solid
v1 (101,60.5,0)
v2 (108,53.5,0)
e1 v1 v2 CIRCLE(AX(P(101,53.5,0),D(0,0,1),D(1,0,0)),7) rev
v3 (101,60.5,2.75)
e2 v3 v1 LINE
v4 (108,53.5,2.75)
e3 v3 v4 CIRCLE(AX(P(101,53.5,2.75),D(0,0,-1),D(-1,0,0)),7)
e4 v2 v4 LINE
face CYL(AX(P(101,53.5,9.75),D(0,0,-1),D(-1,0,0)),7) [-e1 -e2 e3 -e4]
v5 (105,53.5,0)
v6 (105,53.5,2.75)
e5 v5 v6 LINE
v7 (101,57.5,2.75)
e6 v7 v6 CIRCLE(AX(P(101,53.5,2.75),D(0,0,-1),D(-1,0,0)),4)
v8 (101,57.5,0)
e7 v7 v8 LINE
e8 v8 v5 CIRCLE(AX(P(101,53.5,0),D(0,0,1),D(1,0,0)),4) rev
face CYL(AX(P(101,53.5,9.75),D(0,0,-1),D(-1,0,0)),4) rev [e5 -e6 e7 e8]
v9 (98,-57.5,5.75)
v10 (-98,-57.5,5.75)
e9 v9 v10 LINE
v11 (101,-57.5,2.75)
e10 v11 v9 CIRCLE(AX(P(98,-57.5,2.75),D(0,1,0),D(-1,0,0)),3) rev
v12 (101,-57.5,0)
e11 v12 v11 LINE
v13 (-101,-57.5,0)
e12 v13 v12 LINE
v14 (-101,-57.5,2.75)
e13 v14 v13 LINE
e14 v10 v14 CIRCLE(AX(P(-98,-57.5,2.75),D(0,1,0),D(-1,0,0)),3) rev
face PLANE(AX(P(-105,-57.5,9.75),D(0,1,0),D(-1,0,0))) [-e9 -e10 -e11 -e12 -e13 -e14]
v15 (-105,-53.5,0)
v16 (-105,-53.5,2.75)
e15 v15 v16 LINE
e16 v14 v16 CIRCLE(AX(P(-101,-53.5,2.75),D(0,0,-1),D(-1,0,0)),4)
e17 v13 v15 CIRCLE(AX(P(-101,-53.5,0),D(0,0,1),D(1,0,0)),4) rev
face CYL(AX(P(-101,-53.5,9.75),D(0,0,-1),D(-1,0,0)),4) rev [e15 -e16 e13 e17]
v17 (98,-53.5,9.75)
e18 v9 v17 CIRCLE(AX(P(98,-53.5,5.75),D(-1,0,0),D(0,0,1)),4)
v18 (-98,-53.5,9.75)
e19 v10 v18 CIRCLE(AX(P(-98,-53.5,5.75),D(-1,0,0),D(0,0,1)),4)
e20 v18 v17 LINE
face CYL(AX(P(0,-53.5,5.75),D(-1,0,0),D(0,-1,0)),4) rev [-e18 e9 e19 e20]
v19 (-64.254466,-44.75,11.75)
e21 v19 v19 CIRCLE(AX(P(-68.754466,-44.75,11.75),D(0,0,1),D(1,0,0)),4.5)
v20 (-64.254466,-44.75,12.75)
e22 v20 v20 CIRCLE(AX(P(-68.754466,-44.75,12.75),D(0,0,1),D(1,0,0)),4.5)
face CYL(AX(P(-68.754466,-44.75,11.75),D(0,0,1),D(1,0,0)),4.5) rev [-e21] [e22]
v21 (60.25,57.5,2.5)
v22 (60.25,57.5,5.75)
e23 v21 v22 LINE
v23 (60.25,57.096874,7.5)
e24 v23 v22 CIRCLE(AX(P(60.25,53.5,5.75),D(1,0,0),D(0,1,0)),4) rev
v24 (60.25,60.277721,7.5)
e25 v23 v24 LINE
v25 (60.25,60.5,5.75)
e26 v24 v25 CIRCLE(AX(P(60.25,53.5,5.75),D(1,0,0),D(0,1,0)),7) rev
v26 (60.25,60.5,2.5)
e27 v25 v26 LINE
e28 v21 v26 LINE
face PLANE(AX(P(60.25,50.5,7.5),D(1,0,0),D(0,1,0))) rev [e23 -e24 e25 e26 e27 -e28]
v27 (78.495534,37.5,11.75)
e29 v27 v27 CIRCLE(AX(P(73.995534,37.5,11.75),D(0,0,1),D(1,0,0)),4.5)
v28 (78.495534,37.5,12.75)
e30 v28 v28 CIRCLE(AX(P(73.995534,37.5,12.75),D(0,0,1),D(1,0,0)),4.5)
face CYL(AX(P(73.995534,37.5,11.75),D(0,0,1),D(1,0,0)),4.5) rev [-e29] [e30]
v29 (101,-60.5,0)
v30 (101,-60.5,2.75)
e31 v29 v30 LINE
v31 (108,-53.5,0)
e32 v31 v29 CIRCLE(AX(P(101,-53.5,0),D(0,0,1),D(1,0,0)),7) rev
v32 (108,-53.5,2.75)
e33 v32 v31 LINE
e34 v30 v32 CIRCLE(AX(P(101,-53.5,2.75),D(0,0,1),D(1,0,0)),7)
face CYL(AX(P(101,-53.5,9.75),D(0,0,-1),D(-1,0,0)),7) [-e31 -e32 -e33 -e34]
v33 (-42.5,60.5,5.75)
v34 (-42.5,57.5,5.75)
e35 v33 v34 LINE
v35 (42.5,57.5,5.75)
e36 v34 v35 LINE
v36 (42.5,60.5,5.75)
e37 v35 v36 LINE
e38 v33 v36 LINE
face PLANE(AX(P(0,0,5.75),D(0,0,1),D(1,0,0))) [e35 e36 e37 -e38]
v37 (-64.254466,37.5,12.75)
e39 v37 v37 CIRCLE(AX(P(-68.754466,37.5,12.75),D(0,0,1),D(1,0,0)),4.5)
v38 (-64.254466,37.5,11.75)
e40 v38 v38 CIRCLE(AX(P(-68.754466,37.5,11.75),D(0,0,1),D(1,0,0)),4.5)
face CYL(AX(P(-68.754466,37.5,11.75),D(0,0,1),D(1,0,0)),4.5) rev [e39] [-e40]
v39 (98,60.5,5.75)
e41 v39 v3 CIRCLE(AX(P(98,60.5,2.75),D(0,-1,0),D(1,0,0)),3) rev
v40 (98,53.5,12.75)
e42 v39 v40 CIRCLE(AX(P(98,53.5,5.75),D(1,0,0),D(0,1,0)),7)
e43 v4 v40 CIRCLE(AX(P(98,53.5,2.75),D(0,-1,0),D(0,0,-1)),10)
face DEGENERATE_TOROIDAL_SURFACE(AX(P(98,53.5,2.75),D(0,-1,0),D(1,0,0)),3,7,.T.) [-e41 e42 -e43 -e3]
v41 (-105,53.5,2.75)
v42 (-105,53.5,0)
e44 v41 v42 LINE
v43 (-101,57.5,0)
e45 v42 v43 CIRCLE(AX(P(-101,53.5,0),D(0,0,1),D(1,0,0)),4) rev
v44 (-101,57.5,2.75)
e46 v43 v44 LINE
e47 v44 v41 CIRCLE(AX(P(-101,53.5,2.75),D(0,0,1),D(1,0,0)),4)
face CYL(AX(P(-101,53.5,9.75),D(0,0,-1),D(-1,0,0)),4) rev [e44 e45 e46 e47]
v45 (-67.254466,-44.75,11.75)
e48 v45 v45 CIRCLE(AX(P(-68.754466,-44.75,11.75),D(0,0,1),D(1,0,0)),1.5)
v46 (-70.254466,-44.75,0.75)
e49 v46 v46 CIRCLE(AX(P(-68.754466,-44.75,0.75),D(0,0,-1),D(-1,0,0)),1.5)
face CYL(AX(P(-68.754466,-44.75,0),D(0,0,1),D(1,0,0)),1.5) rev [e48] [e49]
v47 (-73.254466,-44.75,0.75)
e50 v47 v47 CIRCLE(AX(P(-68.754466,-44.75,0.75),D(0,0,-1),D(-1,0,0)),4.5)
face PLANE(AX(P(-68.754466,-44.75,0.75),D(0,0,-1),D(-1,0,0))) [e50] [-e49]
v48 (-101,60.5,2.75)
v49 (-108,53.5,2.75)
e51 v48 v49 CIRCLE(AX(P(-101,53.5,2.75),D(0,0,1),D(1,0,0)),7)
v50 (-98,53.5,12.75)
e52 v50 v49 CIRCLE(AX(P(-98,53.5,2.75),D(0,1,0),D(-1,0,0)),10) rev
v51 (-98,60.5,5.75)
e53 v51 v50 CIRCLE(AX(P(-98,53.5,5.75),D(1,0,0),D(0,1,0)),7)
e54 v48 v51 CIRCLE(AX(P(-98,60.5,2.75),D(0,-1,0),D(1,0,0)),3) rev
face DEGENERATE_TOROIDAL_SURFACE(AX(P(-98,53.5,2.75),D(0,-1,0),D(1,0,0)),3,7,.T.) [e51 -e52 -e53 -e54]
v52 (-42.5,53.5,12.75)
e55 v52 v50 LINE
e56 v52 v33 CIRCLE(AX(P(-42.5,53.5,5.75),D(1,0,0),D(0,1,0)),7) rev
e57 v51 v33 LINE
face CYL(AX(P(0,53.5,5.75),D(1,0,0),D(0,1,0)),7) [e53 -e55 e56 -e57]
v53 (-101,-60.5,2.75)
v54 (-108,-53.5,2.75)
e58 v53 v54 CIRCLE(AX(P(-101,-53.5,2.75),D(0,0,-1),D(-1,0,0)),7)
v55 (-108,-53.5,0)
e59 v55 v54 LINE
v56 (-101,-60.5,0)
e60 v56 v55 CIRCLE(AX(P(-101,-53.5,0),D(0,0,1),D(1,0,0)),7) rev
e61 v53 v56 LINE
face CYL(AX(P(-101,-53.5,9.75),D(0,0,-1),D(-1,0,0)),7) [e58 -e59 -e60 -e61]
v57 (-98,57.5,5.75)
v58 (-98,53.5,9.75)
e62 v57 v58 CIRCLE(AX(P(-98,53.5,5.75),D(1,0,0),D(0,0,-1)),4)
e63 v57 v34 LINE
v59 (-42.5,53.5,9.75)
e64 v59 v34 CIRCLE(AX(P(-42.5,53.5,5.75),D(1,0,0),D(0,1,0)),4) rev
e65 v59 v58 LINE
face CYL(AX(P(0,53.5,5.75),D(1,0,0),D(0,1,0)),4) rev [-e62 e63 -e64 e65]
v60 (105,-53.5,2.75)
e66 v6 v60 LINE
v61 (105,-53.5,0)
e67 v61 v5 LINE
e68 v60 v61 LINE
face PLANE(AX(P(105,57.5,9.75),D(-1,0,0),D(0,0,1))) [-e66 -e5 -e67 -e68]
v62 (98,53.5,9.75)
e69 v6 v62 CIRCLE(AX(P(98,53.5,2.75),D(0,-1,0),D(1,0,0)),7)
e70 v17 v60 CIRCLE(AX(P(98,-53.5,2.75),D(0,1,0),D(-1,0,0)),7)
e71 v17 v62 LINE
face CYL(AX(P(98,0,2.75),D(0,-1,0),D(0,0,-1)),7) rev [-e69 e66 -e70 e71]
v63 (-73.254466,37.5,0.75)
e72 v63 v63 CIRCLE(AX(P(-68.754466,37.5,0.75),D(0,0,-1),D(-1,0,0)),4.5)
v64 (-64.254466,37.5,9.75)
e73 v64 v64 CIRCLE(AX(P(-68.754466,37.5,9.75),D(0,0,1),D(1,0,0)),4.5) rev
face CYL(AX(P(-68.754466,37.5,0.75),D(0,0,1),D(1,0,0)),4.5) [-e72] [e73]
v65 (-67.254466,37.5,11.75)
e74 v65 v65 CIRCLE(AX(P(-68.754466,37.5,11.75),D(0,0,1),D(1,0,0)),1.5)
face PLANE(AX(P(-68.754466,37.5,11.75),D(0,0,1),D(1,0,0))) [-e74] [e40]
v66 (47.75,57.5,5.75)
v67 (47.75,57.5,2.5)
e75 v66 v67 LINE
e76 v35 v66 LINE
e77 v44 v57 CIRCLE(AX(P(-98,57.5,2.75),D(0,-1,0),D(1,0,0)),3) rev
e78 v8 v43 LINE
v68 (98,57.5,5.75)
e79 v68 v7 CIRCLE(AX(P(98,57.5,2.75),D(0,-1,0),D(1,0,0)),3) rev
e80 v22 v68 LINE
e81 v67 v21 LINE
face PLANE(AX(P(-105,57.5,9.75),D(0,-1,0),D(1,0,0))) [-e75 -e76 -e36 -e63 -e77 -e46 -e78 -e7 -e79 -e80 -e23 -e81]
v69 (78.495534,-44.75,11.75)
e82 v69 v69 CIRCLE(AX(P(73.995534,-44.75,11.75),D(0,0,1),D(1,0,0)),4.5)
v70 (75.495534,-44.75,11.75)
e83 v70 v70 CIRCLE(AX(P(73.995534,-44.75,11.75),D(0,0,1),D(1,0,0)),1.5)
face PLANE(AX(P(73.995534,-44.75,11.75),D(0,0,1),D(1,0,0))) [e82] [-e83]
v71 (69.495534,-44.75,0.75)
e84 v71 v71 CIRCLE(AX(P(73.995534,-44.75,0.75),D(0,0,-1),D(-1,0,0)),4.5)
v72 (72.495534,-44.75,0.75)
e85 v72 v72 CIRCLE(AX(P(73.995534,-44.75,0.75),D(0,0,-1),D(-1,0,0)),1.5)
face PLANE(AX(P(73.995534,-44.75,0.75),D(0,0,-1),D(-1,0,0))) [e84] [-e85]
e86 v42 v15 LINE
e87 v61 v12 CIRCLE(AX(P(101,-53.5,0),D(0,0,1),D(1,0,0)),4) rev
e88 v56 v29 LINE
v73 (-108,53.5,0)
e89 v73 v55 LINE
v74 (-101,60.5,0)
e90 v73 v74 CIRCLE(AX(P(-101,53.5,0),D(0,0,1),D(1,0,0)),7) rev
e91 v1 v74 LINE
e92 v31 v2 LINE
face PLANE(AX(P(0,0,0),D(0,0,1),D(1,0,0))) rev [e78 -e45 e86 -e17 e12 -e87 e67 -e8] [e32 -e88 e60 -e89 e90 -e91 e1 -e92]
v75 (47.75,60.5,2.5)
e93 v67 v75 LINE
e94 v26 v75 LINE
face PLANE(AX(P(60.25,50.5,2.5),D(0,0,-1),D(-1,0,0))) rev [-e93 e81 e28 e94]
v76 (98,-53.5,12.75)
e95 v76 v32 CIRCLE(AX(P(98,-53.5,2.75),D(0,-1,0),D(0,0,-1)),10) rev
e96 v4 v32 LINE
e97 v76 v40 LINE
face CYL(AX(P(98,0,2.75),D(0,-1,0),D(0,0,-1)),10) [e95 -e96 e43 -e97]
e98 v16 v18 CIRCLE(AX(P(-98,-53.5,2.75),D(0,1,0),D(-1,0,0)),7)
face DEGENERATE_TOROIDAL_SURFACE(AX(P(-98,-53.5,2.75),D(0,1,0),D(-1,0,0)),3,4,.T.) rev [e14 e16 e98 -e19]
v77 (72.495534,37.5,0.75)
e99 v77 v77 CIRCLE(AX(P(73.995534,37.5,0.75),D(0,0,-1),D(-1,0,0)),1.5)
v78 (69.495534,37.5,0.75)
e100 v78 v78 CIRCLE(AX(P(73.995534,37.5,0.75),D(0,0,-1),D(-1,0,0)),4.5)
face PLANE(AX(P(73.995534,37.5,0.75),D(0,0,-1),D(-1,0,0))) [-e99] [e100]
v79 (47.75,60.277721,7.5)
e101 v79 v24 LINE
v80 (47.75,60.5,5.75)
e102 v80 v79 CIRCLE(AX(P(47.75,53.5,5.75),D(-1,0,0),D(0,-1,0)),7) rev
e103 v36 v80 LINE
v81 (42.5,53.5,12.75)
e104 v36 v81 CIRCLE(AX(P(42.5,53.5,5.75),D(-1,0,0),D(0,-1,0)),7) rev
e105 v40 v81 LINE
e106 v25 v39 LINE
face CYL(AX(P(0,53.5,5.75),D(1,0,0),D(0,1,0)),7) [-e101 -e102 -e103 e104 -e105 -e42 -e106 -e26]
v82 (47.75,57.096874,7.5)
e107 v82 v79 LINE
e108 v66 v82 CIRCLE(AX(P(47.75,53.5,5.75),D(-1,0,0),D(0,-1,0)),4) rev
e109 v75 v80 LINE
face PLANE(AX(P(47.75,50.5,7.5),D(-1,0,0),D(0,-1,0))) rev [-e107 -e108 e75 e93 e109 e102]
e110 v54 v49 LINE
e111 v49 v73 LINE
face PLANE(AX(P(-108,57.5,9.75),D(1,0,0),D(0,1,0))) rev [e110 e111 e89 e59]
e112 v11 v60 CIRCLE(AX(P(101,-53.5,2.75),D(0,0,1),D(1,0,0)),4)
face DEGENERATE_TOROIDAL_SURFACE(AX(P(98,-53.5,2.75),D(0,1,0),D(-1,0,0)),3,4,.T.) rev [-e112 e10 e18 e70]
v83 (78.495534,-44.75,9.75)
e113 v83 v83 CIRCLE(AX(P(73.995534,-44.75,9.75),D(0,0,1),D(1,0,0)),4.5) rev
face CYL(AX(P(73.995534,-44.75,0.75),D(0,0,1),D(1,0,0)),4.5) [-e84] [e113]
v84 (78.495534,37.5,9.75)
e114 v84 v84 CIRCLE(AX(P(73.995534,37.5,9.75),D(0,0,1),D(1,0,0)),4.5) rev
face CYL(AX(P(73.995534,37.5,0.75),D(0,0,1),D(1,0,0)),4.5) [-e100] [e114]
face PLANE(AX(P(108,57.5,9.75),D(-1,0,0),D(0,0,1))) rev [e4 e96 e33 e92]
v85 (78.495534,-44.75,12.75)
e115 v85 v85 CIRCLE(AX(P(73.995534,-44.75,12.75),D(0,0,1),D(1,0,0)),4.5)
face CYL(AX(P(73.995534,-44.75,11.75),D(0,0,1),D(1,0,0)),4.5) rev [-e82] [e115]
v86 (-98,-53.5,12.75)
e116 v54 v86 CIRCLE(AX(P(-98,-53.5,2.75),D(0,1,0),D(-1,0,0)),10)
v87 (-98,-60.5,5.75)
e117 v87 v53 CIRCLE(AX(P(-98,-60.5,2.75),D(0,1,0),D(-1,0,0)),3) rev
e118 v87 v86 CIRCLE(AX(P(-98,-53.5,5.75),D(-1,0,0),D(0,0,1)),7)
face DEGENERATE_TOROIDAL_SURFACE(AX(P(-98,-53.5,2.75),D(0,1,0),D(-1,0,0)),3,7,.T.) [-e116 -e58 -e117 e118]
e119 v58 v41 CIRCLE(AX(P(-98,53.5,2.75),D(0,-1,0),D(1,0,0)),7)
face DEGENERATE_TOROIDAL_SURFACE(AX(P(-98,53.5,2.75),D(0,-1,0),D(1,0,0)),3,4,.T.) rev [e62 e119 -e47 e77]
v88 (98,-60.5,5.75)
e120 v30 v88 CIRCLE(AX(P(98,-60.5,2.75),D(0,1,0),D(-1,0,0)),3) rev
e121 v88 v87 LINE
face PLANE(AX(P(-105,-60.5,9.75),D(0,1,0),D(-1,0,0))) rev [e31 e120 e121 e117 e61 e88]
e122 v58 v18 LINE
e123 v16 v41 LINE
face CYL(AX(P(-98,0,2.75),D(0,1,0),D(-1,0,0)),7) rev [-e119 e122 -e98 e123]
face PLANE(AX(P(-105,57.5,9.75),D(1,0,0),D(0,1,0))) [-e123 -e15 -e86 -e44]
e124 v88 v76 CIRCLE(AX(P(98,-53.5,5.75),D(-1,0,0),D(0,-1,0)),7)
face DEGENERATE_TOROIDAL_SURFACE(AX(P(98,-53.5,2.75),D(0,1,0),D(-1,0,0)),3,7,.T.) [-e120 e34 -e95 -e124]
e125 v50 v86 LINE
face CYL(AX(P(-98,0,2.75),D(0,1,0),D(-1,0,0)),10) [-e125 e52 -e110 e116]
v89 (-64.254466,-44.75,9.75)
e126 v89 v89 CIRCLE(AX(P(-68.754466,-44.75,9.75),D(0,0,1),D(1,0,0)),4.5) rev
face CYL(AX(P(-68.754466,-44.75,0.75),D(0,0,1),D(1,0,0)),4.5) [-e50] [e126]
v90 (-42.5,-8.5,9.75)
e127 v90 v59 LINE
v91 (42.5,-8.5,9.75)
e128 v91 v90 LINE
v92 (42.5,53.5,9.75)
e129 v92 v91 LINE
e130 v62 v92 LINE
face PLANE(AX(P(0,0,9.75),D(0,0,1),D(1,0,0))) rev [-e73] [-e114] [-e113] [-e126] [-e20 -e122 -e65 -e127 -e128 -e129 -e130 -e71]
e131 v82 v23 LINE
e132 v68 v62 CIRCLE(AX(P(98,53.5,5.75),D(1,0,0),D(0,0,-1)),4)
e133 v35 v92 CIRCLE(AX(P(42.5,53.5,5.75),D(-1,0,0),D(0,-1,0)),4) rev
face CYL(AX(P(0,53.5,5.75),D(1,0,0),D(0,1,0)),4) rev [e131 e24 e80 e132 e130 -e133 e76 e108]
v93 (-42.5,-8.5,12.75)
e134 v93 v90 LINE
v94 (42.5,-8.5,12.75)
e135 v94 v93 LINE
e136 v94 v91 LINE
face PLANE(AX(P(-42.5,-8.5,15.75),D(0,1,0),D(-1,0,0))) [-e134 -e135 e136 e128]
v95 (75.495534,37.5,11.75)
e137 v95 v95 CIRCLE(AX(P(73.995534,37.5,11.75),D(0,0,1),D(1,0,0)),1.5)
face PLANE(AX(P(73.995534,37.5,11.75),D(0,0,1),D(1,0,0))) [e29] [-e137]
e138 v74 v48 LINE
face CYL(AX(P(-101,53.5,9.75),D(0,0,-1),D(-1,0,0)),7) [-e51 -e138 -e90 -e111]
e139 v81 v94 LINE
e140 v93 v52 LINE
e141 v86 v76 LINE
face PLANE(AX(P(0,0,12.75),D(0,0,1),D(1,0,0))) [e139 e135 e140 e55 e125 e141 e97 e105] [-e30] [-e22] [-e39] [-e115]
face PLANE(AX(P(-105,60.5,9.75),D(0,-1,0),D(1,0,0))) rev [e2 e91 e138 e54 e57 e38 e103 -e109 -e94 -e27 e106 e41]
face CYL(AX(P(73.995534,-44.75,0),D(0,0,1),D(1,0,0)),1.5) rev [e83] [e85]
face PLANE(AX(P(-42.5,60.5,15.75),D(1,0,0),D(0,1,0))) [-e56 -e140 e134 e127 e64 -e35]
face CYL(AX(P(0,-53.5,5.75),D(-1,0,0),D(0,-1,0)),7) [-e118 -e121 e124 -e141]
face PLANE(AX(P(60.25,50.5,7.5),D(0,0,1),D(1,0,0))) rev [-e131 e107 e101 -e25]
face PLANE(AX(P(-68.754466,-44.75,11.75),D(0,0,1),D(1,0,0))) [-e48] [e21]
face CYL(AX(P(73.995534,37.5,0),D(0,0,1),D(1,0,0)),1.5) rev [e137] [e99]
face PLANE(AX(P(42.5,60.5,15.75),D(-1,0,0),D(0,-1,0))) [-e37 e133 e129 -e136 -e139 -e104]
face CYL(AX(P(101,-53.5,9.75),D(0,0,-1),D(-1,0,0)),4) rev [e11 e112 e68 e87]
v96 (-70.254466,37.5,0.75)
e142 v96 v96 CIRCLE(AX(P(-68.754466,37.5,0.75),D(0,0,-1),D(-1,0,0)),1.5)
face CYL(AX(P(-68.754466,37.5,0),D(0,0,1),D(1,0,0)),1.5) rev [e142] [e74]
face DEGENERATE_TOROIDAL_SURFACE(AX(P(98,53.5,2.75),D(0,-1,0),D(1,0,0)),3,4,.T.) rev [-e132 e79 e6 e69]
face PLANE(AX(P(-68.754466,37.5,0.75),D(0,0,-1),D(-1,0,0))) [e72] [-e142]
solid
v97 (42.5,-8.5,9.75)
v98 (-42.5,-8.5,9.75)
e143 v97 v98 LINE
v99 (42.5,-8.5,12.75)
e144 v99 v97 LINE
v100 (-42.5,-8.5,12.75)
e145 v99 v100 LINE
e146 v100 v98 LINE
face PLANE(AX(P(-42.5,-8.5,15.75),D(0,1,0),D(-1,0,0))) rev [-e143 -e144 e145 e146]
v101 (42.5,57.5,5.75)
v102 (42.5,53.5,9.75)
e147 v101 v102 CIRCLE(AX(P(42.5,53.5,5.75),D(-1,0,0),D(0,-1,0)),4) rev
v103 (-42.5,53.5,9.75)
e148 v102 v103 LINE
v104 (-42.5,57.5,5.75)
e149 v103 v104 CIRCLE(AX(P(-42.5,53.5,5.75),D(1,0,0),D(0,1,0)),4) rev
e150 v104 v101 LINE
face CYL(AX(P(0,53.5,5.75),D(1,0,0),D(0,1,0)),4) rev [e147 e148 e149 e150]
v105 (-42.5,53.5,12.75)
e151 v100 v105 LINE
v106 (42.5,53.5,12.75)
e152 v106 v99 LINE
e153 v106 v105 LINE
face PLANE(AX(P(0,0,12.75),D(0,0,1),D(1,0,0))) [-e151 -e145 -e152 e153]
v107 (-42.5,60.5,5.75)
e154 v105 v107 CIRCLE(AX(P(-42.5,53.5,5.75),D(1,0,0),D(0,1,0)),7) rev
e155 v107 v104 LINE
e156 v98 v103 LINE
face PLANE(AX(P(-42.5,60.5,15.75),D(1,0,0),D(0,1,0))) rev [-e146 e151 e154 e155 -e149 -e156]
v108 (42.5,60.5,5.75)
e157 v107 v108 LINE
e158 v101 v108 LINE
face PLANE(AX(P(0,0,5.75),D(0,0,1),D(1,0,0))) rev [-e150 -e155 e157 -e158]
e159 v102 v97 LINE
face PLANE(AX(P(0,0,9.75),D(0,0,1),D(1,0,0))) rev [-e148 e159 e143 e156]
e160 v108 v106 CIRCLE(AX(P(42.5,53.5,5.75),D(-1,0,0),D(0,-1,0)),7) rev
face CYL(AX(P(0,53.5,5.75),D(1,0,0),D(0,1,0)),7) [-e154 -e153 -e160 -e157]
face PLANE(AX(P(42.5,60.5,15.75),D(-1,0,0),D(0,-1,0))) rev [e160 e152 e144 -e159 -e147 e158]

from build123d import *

# Parameters (mm, degrees)
SKETCH_1_W             = 210
SKETCH_1_H             = 115
EXTRUDE_6_DEPTH        = 9.75
FILLET_6_R             = 7
FILLET_7_R             = 4
SHELL_6_T              = 3
SKETCH_17_R            = 4.5
SKETCH_17_R_2          = 1.5
CUT_EXTRUDE_2_DEPTH    = 1
SKETCH_20_R            = 1.5
CUT_EXTRUDE_3_DEPTH    = 125.446022435
SKETCH_12_R            = 4.5
SKETCH_12_R_2          = 1.5
EXTRUDE_12_DEPTH       = 9
SKETCH_21_W            = 12.5
SKETCH_21_H            = 5
CUT_EXTRUDE_4_DEPTH    = 10
SPLIT_START            = -42.5
SPLIT_BODIES_4_DEPTH   = 85
SPLIT_BODIES_4_2_DEPTH = 85


# Read off the part's stored shape, not the designer's step: Разделить4
with BuildPart() as part:
    # Эскиз1 → Бобышка-Вытянуть6 (new body)
    with BuildSketch(Plane.XY):
        Rectangle(SKETCH_1_W, SKETCH_1_H)
    extrude(amount=EXTRUDE_6_DEPTH)

    # Скругление6
    fillet_6_edges = [part.edges().sort_by_distance(p)[0] for p in [
        (105, 0, 9.75),
        (-105, 0, 9.75),
    ]]
    fillet(fillet_6_edges, radius=FILLET_6_R)

    # Скругление7
    fillet_7_edges = [part.edges().sort_by_distance(p)[0] for p in [
        (0, -57.5, 9.75),
        (0, 57.5, 9.75),
        (-105, 57.5, 1.375),
        (105, 57.5, 1.375),
        (-102.949747468, 57.5, 7.699747468),
        (102.949747468, 57.5, 7.699747468),
        (105, -57.5, 1.375),
        (-105, -57.5, 1.375),
        (-102.949747468, -57.5, 7.699747468),
        (102.949747468, -57.5, 7.699747468),
    ]]
    fillet(fillet_7_edges, radius=FILLET_7_R)

    # Оболочка6
    shell_6_openings = [part.faces().sort_by_distance(p)[0] for p in [
        (0, 0, 0),
    ]]
    offset(amount=SHELL_6_T, openings=shell_6_openings, kind=Kind.INTERSECTION)

    # Эскиз17 → Вырез-Вытянуть2 (cut)
    # profile 1 of 4: a face of its own
    with BuildSketch(Plane.XY.offset(12.75)):
        with Locations((73.99553429, 37.5)):
            Circle(SKETCH_17_R)
        with Locations((73.99553429, 37.5)):
            Circle(SKETCH_17_R_2, mode=Mode.SUBTRACT)
    # profile 2 of 4: a face of its own
    with BuildSketch(Plane.XY.offset(12.75)):
        with Locations((-68.75446571, 37.5)):
            Circle(SKETCH_17_R)
        with Locations((-68.75446571, 37.5)):
            Circle(SKETCH_17_R_2, mode=Mode.SUBTRACT)
    # profile 3 of 4: a face of its own
    with BuildSketch(Plane.XY.offset(12.75)):
        with Locations((73.99553429, -44.75)):
            Circle(SKETCH_17_R)
        with Locations((73.99553429, -44.75)):
            Circle(SKETCH_17_R_2, mode=Mode.SUBTRACT)
    # profile 4 of 4: a face of its own
    with BuildSketch(Plane.XY.offset(12.75)):
        with Locations((-68.75446571, -44.75)):
            Circle(SKETCH_17_R)
        with Locations((-68.75446571, -44.75)):
            Circle(SKETCH_17_R_2, mode=Mode.SUBTRACT)
    extrude(amount=-CUT_EXTRUDE_2_DEPTH, mode=Mode.SUBTRACT)

    # Эскиз20 → Вырез-Вытянуть3 (cut, through all)
    with BuildSketch(Plane.XY.offset(12.75)):
        with Locations((-68.75446571, 37.5)):
            Circle(SKETCH_20_R)
        with Locations((73.99553429, 37.5)):
            Circle(SKETCH_20_R)
        with Locations((73.99553429, -44.75)):
            Circle(SKETCH_20_R)
        with Locations((-68.75446571, -44.75)):
            Circle(SKETCH_20_R)
    extrude(amount=-CUT_EXTRUDE_3_DEPTH, mode=Mode.SUBTRACT)

    # Эскиз12 → Бобышка-Вытянуть12 (add)
    # profile 1 of 4: a face of its own
    with BuildSketch(Plane(origin=(0, 0, 9.75), x_dir=(-1, 0, 0), z_dir=(0, 0, -1))):
        with Locations(Location((68.75446571, 37.5, 0), (0, 0, 180))):
            Circle(SKETCH_12_R)
        with Locations(Location((68.75446571, 37.5, 0), (0, 0, 180))):
            Circle(SKETCH_12_R_2, mode=Mode.SUBTRACT)
    # profile 2 of 4: a face of its own
    with BuildSketch(Plane(origin=(0, 0, 9.75), x_dir=(-1, 0, 0), z_dir=(0, 0, -1))):
        with Locations(Location((-73.99553429, 37.5, 0), (0, 0, 180))):
            Circle(SKETCH_12_R)
        with Locations(Location((-73.99553429, 37.5, 0), (0, 0, 180))):
            Circle(SKETCH_12_R_2, mode=Mode.SUBTRACT)
    # profile 3 of 4: a face of its own
    with BuildSketch(Plane(origin=(0, 0, 9.75), x_dir=(-1, 0, 0), z_dir=(0, 0, -1))):
        with Locations(Location((68.75446571, -44.75, 0), (0, 0, 180))):
            Circle(SKETCH_12_R)
        with Locations(Location((68.75446571, -44.75, 0), (0, 0, 180))):
            Circle(SKETCH_12_R_2, mode=Mode.SUBTRACT)
    # profile 4 of 4: a face of its own
    with BuildSketch(Plane(origin=(0, 0, 9.75), x_dir=(-1, 0, 0), z_dir=(0, 0, -1))):
        with Locations(Location((-73.99553429, -44.75, 0), (0, 0, 180))):
            Circle(SKETCH_12_R)
        with Locations(Location((-73.99553429, -44.75, 0), (0, 0, 180))):
            Circle(SKETCH_12_R_2, mode=Mode.SUBTRACT)
    extrude(amount=EXTRUDE_12_DEPTH)

    # Эскиз21 → Вырез-Вытянуть4 (cut)
    with BuildSketch(Plane(origin=(0, 60.5, 0), x_dir=(1, 0, 0), z_dir=(0, 1, 0))):
        with Locations((54, -5)):
            Rectangle(SKETCH_21_W, SKETCH_21_H)
    extrude(amount=-CUT_EXTRUDE_4_DEPTH, mode=Mode.SUBTRACT)

    # Split Bodies 4 2 outline → Split Bodies 4 2 (cut)
    with BuildSketch(Plane.YZ.offset(SPLIT_START)):
        with BuildLine():
            Line((-8.5, 12.75), (-8.5, 9.75))
            Line((-8.5, 9.75), (53.5, 9.75))
            ThreePointArc((53.5, 9.75), (56.328427125, 8.578427125), (57.5, 5.75))
            Line((57.5, 5.75), (60.5, 5.75))
            ThreePointArc((60.5, 5.75), (58.449747468, 10.699747468), (53.5, 12.75))
            Line((53.5, 12.75), (-8.5, 12.75))
        make_face()
    extrude(amount=SPLIT_BODIES_4_2_DEPTH, mode=Mode.SUBTRACT)


with BuildPart() as body_2:
    # Split Bodies 4 outline → Split Bodies 4 (new body)
    with BuildSketch(Plane.YZ.offset(SPLIT_START)):
        with BuildLine():
            Line((57.5, 5.75), (60.5, 5.75))
            ThreePointArc((60.5, 5.75), (58.449747468, 10.699747468), (53.5, 12.75))
            Line((53.5, 12.75), (-8.5, 12.75))
            Line((-8.5, 12.75), (-8.5, 9.75))
            Line((-8.5, 9.75), (53.5, 9.75))
            ThreePointArc((53.5, 9.75), (56.328427125, 8.578427125), (57.5, 5.75))
        make_face()
    extrude(amount=SPLIT_BODIES_4_DEPTH)


solid = Compound([part.part, body_2.part])
